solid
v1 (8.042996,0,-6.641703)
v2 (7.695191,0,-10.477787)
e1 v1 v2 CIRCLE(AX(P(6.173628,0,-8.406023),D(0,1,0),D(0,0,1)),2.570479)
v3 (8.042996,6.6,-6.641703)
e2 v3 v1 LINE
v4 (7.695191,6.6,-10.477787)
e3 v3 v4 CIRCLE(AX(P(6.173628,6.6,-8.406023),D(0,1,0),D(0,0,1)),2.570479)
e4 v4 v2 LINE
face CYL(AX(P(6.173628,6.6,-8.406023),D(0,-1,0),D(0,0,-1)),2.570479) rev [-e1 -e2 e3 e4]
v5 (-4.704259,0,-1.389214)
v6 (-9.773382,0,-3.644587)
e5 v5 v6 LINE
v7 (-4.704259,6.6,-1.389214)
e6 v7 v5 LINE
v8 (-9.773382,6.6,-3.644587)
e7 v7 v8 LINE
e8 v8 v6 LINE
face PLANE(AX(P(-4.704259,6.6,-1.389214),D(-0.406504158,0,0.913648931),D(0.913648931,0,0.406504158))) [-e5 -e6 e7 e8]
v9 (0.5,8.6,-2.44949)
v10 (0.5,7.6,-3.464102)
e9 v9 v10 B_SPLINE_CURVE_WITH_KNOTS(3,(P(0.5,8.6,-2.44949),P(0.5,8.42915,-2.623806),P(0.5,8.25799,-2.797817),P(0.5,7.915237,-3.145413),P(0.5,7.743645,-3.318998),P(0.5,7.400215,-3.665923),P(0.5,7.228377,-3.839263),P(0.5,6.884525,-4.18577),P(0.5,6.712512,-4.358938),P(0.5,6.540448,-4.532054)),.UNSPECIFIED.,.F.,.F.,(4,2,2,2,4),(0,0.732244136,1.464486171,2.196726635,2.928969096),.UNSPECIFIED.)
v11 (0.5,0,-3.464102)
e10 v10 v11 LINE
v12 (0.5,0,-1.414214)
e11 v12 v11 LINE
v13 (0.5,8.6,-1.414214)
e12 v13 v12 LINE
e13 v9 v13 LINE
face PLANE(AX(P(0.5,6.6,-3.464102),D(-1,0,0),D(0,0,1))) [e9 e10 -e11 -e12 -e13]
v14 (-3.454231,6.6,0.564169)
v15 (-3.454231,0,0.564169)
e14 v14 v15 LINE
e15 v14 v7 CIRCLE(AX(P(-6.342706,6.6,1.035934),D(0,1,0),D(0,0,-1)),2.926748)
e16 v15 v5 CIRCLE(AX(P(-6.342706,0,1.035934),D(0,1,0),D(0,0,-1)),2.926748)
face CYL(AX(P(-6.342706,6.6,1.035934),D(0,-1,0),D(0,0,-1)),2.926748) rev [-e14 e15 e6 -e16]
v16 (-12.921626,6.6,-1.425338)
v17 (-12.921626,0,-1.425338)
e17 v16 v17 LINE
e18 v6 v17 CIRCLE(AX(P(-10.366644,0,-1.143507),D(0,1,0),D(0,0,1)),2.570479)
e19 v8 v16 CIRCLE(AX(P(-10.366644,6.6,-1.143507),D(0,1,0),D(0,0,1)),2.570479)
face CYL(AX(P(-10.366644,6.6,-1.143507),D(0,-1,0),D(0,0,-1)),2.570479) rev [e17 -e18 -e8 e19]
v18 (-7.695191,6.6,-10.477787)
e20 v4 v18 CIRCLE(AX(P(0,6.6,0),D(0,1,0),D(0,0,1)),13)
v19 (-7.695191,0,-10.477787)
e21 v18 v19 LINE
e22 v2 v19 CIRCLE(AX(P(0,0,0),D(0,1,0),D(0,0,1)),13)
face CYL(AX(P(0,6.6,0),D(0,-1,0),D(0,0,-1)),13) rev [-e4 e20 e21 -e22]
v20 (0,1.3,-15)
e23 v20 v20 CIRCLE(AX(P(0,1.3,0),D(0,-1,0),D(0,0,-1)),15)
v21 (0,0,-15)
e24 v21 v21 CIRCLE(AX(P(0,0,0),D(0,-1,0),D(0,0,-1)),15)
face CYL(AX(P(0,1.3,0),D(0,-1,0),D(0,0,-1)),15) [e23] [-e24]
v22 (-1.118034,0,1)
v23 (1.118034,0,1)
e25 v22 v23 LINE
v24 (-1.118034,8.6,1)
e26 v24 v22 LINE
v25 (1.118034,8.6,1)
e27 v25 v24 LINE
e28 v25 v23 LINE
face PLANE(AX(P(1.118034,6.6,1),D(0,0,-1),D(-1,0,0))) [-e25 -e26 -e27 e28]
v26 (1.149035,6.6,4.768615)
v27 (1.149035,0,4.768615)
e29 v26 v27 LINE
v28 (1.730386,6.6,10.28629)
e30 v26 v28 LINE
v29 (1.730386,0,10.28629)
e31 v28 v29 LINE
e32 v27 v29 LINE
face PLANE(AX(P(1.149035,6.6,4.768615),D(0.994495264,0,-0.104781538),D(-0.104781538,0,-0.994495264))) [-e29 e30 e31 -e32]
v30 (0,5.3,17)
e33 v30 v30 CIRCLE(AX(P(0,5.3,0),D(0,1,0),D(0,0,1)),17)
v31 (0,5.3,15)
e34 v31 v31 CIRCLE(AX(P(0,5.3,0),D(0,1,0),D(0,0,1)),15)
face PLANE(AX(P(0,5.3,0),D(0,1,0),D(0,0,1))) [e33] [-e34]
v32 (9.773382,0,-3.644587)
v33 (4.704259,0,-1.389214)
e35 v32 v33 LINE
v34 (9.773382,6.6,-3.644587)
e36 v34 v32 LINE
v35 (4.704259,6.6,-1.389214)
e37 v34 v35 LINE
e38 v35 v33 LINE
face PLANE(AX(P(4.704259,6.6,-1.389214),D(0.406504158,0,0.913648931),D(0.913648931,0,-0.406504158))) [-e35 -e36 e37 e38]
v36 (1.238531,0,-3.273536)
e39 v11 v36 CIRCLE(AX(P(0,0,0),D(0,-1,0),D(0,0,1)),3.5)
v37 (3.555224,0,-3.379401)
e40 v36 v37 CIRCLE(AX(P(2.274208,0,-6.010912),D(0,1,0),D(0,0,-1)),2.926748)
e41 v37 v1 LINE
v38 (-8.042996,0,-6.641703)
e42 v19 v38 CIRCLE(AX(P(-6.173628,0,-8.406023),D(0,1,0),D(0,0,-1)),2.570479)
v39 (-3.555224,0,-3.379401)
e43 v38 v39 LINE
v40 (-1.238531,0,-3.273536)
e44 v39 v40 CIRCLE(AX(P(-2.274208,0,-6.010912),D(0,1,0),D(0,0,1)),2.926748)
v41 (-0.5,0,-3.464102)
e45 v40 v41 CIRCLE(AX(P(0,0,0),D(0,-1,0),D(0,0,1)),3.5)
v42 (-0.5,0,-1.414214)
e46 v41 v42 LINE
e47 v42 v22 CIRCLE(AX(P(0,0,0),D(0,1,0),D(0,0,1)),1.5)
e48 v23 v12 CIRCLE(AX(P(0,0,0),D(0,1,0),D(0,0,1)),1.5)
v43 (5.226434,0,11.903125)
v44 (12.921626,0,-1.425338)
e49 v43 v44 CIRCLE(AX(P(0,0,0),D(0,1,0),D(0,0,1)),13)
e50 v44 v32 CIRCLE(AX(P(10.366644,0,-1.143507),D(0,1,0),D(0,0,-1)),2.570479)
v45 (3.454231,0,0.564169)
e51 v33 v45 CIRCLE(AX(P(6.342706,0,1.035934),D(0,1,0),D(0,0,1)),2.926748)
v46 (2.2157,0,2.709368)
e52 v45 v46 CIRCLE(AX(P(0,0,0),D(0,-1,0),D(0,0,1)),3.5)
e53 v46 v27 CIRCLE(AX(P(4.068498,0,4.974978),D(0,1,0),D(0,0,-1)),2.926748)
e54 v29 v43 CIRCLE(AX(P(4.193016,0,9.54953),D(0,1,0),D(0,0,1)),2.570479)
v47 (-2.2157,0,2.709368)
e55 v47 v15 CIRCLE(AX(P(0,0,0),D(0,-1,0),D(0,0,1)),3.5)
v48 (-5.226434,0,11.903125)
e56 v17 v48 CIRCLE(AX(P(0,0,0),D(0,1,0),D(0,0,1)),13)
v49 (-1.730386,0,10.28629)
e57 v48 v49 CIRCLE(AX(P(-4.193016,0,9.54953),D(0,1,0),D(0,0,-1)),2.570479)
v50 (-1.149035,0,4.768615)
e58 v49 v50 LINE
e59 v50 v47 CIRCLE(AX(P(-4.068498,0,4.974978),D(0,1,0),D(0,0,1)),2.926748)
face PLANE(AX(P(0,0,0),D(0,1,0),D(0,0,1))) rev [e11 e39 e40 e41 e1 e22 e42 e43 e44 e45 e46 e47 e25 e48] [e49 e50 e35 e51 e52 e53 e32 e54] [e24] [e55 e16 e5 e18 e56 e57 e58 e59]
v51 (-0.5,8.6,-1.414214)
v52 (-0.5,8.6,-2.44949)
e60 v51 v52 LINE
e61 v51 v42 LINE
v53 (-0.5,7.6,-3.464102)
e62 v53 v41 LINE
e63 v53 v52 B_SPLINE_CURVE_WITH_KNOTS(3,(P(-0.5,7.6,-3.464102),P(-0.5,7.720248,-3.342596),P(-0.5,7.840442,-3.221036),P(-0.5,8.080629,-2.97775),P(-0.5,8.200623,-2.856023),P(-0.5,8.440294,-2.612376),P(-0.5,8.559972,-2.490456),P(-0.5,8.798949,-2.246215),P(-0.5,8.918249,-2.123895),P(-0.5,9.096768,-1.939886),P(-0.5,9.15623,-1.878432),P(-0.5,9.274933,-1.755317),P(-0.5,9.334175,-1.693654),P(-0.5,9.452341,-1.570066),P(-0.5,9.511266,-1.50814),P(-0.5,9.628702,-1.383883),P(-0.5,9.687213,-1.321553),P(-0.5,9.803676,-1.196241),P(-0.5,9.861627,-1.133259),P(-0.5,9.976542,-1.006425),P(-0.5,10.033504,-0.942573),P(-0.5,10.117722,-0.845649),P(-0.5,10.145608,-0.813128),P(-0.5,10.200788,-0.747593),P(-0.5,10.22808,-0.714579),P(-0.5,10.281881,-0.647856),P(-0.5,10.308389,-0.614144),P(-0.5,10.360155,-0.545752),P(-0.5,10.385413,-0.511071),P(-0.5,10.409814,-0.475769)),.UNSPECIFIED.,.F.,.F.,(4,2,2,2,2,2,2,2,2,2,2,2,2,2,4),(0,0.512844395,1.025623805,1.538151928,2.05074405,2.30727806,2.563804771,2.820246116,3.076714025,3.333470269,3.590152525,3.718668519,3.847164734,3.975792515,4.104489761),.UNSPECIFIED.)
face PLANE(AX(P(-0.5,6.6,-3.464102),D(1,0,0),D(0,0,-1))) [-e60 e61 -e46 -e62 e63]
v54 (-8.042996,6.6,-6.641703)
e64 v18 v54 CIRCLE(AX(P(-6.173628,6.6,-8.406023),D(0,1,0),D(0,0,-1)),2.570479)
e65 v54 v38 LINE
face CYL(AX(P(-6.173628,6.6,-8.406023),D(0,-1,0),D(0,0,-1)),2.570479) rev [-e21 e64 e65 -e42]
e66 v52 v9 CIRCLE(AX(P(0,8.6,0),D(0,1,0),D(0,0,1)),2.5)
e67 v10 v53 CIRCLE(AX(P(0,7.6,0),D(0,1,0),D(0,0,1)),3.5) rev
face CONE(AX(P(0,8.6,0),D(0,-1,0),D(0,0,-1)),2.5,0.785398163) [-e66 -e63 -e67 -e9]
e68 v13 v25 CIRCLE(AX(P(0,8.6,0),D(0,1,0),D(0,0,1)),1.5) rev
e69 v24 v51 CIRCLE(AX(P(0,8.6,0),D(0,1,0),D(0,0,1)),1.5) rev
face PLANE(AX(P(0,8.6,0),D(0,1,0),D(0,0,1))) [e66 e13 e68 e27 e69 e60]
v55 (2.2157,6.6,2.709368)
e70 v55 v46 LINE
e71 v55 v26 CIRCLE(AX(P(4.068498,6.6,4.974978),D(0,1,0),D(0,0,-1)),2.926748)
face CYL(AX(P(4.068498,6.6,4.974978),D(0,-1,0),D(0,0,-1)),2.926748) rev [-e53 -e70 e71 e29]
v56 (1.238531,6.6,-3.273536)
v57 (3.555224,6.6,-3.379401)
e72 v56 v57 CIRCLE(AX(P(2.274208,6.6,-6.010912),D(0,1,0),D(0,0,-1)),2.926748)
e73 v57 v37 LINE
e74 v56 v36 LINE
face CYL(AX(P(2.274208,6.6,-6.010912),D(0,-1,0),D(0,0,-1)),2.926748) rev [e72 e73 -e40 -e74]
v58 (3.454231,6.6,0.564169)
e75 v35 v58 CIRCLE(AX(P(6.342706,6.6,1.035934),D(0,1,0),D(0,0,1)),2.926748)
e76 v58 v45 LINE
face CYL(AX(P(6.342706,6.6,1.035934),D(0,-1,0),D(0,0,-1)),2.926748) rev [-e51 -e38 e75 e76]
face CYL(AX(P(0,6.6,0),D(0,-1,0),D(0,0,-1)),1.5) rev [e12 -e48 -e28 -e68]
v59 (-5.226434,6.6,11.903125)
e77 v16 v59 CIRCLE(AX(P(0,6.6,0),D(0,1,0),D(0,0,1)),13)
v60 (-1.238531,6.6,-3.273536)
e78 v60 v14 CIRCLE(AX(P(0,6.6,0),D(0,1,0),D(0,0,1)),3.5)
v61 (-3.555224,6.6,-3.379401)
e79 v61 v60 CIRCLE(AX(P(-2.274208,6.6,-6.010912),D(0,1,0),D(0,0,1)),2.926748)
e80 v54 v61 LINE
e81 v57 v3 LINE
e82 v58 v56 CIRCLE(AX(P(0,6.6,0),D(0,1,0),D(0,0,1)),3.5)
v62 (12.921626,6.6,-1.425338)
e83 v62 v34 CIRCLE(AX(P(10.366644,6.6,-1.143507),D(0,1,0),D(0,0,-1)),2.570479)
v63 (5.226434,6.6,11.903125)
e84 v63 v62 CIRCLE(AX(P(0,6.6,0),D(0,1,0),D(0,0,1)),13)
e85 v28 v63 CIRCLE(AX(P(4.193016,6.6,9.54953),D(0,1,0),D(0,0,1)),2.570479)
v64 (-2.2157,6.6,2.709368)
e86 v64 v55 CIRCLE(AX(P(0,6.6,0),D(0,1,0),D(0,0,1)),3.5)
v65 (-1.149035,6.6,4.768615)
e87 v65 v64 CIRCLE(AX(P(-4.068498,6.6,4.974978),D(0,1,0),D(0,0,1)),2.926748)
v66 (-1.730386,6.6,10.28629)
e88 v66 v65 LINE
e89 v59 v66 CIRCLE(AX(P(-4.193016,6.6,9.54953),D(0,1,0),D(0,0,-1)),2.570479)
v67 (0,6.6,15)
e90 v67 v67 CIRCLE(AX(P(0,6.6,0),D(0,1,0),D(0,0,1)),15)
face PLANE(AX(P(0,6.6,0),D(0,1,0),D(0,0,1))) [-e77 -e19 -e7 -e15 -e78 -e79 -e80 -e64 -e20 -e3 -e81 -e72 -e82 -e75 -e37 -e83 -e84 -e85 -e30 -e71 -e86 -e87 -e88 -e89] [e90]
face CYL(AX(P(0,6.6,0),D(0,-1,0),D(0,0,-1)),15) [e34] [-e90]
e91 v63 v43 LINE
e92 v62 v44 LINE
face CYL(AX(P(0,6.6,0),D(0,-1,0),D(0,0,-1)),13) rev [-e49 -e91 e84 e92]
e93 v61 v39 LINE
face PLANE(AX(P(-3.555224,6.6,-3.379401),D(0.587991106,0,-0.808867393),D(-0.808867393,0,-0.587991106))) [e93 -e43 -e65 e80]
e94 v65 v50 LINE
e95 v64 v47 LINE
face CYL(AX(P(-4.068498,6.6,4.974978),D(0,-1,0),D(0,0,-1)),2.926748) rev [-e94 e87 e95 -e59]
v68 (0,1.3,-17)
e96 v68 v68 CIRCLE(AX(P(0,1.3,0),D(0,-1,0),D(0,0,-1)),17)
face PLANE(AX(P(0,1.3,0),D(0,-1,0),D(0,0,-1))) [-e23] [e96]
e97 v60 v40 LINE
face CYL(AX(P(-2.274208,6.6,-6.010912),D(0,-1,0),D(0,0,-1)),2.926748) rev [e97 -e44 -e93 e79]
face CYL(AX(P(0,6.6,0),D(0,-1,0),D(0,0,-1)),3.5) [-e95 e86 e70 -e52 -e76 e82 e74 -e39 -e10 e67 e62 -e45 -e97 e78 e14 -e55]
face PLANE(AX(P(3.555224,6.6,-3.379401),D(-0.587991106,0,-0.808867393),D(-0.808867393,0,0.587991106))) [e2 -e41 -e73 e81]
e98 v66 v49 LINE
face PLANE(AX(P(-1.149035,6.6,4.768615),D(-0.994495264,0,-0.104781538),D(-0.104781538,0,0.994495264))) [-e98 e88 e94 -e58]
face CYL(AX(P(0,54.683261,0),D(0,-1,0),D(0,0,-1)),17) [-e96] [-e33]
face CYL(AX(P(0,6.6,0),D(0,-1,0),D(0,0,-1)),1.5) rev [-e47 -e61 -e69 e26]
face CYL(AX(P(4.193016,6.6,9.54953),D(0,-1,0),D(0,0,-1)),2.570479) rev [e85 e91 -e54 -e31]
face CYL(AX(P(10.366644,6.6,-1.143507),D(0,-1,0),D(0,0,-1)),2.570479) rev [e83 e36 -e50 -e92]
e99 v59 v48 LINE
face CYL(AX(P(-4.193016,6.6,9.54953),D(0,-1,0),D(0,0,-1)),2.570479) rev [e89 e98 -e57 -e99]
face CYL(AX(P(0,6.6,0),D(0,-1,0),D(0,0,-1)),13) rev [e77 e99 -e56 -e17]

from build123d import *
from build123d.topology import SkipClean

# Parameters (mm, degrees)
SKETCH_1_R          = 15
EXTRUDE_1_DEPTH     = 6.6
EXTRUDE_2_DEPTH     = 2
SKETCH_3_R          = 17
SKETCH_3_R_2        = 15
EXTRUDE_3_DEPTH     = 5.3
SKETCH_4_R          = 17
SKETCH_4_R_2        = 15
CUT_EXTRUDE_3_DEPTH = 1.3


with BuildPart() as part:
    # 草图1 → 凸台-拉伸1 (new body)
    with BuildSketch(Plane(origin=(0, 0, 0), x_dir=(1, 0, 0), z_dir=(0, 1, 0))):
        with Locations(Location((0, 0, 0), (0, 0, 270))):
            Circle(SKETCH_1_R)
        with BuildLine():
            Line((1.118033989, -1), (-1.118033989, -1))
            ThreePointArc((-1.118033989, -1), (-1.4531398, 0.37200097), (-0.5, 1.414213562))
            Line((-0.5, 1.414213562), (-0.5, 3.464101615))
            ThreePointArc((-0.5, 3.464101615), (-0.874472135, 3.388996678), (-1.23853126, 3.273536363))
            ThreePointArc((-1.23853126, 3.273536363), (-2.407810688, 3.08721539), (-3.555224024, 3.379401158))
            Line((-3.555224024, 3.379401158), (-8.04299568, 6.641703286))
            ThreePointArc((-8.04299568, 6.641703286), (-8.733606232, 8.638127636), (-7.69519148, 10.477787366))
            ThreePointArc((-7.69519148, 10.477787366), (0, 13), (7.69519148, 10.477787366))
            ThreePointArc((7.69519148, 10.477787366), (8.733606232, 8.638127636), (8.04299568, 6.641703286))
            Line((8.04299568, 6.641703286), (3.555224024, 3.379401158))
            ThreePointArc((3.555224024, 3.379401158), (2.407810688, 3.08721539), (1.23853126, 3.273536363))
            ThreePointArc((1.23853126, 3.273536363), (0.874472135, 3.388996678), (0.5, 3.464101615))
            Line((0.5, 3.464101615), (0.5, 1.414213562))
            ThreePointArc((0.5, 1.414213562), (1.4531398, 0.37200097), (1.118033989, -1))
        make_face(mode=Mode.SUBTRACT)
        with BuildLine():
            Line((-1.149035241, -4.7686149), (-1.73038593, -10.286290225))
            ThreePointArc((-1.73038593, -10.286290225), (-3.114034858, -11.882588681), (-5.226434294, -11.903124992))
            ThreePointArc((-5.226434294, -11.903124992), (-11.258330249, -6.5), (-12.921625774, 1.425337626))
            ThreePointArc((-12.921625774, 1.425337626), (-11.847641089, 3.244461045), (-9.77338161, 3.644586939))
            Line((-9.77338161, 3.644586939), (-4.704259264, 1.389213742))
            ThreePointArc((-4.704259264, 1.389213742), (-3.877512299, 0.541617529), (-3.45423128, -0.564168647))
            ThreePointArc((-3.45423128, -0.564168647), (-3.031088913, -1.75), (-2.21570002, -2.709367716))
            ThreePointArc((-2.21570002, -2.709367716), (-1.469701611, -3.628832918), (-1.149035241, -4.7686149))
        make_face(mode=Mode.SUBTRACT)
        with BuildLine():
            Line((1.149035241, -4.7686149), (1.73038593, -10.286290225))
            ThreePointArc((1.73038593, -10.286290225), (3.114034858, -11.882588681), (5.226434294, -11.903124992))
            ThreePointArc((5.226434294, -11.903124992), (11.258330249, -6.5), (12.921625774, 1.425337626))
            ThreePointArc((12.921625774, 1.425337626), (11.847641089, 3.244461045), (9.77338161, 3.644586939))
            Line((9.77338161, 3.644586939), (4.704259264, 1.389213742))
            ThreePointArc((4.704259264, 1.389213742), (3.877512299, 0.541617529), (3.45423128, -0.564168647))
            ThreePointArc((3.45423128, -0.564168647), (3.031088913, -1.75), (2.21570002, -2.709367716))
            ThreePointArc((2.21570002, -2.709367716), (1.469701611, -3.628832918), (1.149035241, -4.7686149))
        make_face(mode=Mode.SUBTRACT)
    extrude(amount=EXTRUDE_1_DEPTH)

    # 草图2 → 凸台-拉伸2 (add)
    with BuildSketch(Plane(origin=(0, 6.6, 0), x_dir=(1, 0, 0), z_dir=(0, 1, 0))):
        with BuildLine():
            ThreePointArc((3.45423128, -0.564168647), (3.488539055, -0.283011059), (3.5, 0))
            ThreePointArc((3.5, 0), (2.879657915, 1.989364294), (1.23853126, 3.273536363))
            ThreePointArc((1.23853126, 3.273536363), (0.874472135, 3.388996678), (0.5, 3.464101615))
            Line((0.5, 3.464101615), (0.5, 1.414213562))
            ThreePointArc((0.5, 1.414213562), (1.4531398, 0.37200097), (1.118033989, -1))
            Line((1.118033989, -1), (-1.118033989, -1))
            ThreePointArc((-1.118033989, -1), (-1.4531398, 0.37200097), (-0.5, 1.414213562))
            Line((-0.5, 1.414213562), (-0.5, 3.464101615))
            ThreePointArc((-0.5, 3.464101615), (-0.874472135, 3.388996678), (-1.23853126, 3.273536363))
            ThreePointArc((-1.23853126, 3.273536363), (-3.031088913, 1.75), (-3.45423128, -0.564168647))
            ThreePointArc((-3.45423128, -0.564168647), (-3.031088913, -1.75), (-2.21570002, -2.709367716))
            ThreePointArc((-2.21570002, -2.709367716), (0, -3.5), (2.21570002, -2.709367716))
            ThreePointArc((2.21570002, -2.709367716), (3.031088913, -1.75), (3.45423128, -0.564168647))
        make_face()
    extrude(amount=EXTRUDE_2_DEPTH)

    # 倒角1: read off the stored shape, not the designer's step
    # 倒角1 outline → 倒角1 (revolve, cut)
    with BuildSketch(Plane.XY):
        Polygon((3.5, 8.6), (2.5, 8.6), (3.5, 7.6), align=None)
    revolve(axis=Axis((0, 0, 0), (0, 1, 0)), mode=Mode.SUBTRACT)

    # 草图3 → 凸台-拉伸3 (add)
    with SkipClean():  # the faces are left unmerged after this step: merging them gives an invalid solid
        with BuildSketch(Plane(origin=(0, 0, 0), x_dir=(1, 0, 0), z_dir=(0, 1, 0))):
            with Locations(Location((0, 0, 0), (0, 0, 270))):
                Circle(SKETCH_3_R)
            with Locations(Location((0, 0, 0), (0, 0, 270))):
                Circle(SKETCH_3_R_2, mode=Mode.SUBTRACT)
        extrude(amount=EXTRUDE_3_DEPTH)

    # 草图4 → 切除-拉伸3 (cut)
    with SkipClean():  # the faces are left unmerged after this step: merging them gives an invalid solid
        with BuildSketch(Plane.XZ):
            with Locations(Location((0, 0, 0), (0, 0, 270))):
                Circle(SKETCH_4_R)
            with Locations(Location((0, 0, 0), (0, 0, 90))):
                Circle(SKETCH_4_R_2, mode=Mode.SUBTRACT)
        extrude(amount=-CUT_EXTRUDE_3_DEPTH, mode=Mode.SUBTRACT)


solid = part.part
